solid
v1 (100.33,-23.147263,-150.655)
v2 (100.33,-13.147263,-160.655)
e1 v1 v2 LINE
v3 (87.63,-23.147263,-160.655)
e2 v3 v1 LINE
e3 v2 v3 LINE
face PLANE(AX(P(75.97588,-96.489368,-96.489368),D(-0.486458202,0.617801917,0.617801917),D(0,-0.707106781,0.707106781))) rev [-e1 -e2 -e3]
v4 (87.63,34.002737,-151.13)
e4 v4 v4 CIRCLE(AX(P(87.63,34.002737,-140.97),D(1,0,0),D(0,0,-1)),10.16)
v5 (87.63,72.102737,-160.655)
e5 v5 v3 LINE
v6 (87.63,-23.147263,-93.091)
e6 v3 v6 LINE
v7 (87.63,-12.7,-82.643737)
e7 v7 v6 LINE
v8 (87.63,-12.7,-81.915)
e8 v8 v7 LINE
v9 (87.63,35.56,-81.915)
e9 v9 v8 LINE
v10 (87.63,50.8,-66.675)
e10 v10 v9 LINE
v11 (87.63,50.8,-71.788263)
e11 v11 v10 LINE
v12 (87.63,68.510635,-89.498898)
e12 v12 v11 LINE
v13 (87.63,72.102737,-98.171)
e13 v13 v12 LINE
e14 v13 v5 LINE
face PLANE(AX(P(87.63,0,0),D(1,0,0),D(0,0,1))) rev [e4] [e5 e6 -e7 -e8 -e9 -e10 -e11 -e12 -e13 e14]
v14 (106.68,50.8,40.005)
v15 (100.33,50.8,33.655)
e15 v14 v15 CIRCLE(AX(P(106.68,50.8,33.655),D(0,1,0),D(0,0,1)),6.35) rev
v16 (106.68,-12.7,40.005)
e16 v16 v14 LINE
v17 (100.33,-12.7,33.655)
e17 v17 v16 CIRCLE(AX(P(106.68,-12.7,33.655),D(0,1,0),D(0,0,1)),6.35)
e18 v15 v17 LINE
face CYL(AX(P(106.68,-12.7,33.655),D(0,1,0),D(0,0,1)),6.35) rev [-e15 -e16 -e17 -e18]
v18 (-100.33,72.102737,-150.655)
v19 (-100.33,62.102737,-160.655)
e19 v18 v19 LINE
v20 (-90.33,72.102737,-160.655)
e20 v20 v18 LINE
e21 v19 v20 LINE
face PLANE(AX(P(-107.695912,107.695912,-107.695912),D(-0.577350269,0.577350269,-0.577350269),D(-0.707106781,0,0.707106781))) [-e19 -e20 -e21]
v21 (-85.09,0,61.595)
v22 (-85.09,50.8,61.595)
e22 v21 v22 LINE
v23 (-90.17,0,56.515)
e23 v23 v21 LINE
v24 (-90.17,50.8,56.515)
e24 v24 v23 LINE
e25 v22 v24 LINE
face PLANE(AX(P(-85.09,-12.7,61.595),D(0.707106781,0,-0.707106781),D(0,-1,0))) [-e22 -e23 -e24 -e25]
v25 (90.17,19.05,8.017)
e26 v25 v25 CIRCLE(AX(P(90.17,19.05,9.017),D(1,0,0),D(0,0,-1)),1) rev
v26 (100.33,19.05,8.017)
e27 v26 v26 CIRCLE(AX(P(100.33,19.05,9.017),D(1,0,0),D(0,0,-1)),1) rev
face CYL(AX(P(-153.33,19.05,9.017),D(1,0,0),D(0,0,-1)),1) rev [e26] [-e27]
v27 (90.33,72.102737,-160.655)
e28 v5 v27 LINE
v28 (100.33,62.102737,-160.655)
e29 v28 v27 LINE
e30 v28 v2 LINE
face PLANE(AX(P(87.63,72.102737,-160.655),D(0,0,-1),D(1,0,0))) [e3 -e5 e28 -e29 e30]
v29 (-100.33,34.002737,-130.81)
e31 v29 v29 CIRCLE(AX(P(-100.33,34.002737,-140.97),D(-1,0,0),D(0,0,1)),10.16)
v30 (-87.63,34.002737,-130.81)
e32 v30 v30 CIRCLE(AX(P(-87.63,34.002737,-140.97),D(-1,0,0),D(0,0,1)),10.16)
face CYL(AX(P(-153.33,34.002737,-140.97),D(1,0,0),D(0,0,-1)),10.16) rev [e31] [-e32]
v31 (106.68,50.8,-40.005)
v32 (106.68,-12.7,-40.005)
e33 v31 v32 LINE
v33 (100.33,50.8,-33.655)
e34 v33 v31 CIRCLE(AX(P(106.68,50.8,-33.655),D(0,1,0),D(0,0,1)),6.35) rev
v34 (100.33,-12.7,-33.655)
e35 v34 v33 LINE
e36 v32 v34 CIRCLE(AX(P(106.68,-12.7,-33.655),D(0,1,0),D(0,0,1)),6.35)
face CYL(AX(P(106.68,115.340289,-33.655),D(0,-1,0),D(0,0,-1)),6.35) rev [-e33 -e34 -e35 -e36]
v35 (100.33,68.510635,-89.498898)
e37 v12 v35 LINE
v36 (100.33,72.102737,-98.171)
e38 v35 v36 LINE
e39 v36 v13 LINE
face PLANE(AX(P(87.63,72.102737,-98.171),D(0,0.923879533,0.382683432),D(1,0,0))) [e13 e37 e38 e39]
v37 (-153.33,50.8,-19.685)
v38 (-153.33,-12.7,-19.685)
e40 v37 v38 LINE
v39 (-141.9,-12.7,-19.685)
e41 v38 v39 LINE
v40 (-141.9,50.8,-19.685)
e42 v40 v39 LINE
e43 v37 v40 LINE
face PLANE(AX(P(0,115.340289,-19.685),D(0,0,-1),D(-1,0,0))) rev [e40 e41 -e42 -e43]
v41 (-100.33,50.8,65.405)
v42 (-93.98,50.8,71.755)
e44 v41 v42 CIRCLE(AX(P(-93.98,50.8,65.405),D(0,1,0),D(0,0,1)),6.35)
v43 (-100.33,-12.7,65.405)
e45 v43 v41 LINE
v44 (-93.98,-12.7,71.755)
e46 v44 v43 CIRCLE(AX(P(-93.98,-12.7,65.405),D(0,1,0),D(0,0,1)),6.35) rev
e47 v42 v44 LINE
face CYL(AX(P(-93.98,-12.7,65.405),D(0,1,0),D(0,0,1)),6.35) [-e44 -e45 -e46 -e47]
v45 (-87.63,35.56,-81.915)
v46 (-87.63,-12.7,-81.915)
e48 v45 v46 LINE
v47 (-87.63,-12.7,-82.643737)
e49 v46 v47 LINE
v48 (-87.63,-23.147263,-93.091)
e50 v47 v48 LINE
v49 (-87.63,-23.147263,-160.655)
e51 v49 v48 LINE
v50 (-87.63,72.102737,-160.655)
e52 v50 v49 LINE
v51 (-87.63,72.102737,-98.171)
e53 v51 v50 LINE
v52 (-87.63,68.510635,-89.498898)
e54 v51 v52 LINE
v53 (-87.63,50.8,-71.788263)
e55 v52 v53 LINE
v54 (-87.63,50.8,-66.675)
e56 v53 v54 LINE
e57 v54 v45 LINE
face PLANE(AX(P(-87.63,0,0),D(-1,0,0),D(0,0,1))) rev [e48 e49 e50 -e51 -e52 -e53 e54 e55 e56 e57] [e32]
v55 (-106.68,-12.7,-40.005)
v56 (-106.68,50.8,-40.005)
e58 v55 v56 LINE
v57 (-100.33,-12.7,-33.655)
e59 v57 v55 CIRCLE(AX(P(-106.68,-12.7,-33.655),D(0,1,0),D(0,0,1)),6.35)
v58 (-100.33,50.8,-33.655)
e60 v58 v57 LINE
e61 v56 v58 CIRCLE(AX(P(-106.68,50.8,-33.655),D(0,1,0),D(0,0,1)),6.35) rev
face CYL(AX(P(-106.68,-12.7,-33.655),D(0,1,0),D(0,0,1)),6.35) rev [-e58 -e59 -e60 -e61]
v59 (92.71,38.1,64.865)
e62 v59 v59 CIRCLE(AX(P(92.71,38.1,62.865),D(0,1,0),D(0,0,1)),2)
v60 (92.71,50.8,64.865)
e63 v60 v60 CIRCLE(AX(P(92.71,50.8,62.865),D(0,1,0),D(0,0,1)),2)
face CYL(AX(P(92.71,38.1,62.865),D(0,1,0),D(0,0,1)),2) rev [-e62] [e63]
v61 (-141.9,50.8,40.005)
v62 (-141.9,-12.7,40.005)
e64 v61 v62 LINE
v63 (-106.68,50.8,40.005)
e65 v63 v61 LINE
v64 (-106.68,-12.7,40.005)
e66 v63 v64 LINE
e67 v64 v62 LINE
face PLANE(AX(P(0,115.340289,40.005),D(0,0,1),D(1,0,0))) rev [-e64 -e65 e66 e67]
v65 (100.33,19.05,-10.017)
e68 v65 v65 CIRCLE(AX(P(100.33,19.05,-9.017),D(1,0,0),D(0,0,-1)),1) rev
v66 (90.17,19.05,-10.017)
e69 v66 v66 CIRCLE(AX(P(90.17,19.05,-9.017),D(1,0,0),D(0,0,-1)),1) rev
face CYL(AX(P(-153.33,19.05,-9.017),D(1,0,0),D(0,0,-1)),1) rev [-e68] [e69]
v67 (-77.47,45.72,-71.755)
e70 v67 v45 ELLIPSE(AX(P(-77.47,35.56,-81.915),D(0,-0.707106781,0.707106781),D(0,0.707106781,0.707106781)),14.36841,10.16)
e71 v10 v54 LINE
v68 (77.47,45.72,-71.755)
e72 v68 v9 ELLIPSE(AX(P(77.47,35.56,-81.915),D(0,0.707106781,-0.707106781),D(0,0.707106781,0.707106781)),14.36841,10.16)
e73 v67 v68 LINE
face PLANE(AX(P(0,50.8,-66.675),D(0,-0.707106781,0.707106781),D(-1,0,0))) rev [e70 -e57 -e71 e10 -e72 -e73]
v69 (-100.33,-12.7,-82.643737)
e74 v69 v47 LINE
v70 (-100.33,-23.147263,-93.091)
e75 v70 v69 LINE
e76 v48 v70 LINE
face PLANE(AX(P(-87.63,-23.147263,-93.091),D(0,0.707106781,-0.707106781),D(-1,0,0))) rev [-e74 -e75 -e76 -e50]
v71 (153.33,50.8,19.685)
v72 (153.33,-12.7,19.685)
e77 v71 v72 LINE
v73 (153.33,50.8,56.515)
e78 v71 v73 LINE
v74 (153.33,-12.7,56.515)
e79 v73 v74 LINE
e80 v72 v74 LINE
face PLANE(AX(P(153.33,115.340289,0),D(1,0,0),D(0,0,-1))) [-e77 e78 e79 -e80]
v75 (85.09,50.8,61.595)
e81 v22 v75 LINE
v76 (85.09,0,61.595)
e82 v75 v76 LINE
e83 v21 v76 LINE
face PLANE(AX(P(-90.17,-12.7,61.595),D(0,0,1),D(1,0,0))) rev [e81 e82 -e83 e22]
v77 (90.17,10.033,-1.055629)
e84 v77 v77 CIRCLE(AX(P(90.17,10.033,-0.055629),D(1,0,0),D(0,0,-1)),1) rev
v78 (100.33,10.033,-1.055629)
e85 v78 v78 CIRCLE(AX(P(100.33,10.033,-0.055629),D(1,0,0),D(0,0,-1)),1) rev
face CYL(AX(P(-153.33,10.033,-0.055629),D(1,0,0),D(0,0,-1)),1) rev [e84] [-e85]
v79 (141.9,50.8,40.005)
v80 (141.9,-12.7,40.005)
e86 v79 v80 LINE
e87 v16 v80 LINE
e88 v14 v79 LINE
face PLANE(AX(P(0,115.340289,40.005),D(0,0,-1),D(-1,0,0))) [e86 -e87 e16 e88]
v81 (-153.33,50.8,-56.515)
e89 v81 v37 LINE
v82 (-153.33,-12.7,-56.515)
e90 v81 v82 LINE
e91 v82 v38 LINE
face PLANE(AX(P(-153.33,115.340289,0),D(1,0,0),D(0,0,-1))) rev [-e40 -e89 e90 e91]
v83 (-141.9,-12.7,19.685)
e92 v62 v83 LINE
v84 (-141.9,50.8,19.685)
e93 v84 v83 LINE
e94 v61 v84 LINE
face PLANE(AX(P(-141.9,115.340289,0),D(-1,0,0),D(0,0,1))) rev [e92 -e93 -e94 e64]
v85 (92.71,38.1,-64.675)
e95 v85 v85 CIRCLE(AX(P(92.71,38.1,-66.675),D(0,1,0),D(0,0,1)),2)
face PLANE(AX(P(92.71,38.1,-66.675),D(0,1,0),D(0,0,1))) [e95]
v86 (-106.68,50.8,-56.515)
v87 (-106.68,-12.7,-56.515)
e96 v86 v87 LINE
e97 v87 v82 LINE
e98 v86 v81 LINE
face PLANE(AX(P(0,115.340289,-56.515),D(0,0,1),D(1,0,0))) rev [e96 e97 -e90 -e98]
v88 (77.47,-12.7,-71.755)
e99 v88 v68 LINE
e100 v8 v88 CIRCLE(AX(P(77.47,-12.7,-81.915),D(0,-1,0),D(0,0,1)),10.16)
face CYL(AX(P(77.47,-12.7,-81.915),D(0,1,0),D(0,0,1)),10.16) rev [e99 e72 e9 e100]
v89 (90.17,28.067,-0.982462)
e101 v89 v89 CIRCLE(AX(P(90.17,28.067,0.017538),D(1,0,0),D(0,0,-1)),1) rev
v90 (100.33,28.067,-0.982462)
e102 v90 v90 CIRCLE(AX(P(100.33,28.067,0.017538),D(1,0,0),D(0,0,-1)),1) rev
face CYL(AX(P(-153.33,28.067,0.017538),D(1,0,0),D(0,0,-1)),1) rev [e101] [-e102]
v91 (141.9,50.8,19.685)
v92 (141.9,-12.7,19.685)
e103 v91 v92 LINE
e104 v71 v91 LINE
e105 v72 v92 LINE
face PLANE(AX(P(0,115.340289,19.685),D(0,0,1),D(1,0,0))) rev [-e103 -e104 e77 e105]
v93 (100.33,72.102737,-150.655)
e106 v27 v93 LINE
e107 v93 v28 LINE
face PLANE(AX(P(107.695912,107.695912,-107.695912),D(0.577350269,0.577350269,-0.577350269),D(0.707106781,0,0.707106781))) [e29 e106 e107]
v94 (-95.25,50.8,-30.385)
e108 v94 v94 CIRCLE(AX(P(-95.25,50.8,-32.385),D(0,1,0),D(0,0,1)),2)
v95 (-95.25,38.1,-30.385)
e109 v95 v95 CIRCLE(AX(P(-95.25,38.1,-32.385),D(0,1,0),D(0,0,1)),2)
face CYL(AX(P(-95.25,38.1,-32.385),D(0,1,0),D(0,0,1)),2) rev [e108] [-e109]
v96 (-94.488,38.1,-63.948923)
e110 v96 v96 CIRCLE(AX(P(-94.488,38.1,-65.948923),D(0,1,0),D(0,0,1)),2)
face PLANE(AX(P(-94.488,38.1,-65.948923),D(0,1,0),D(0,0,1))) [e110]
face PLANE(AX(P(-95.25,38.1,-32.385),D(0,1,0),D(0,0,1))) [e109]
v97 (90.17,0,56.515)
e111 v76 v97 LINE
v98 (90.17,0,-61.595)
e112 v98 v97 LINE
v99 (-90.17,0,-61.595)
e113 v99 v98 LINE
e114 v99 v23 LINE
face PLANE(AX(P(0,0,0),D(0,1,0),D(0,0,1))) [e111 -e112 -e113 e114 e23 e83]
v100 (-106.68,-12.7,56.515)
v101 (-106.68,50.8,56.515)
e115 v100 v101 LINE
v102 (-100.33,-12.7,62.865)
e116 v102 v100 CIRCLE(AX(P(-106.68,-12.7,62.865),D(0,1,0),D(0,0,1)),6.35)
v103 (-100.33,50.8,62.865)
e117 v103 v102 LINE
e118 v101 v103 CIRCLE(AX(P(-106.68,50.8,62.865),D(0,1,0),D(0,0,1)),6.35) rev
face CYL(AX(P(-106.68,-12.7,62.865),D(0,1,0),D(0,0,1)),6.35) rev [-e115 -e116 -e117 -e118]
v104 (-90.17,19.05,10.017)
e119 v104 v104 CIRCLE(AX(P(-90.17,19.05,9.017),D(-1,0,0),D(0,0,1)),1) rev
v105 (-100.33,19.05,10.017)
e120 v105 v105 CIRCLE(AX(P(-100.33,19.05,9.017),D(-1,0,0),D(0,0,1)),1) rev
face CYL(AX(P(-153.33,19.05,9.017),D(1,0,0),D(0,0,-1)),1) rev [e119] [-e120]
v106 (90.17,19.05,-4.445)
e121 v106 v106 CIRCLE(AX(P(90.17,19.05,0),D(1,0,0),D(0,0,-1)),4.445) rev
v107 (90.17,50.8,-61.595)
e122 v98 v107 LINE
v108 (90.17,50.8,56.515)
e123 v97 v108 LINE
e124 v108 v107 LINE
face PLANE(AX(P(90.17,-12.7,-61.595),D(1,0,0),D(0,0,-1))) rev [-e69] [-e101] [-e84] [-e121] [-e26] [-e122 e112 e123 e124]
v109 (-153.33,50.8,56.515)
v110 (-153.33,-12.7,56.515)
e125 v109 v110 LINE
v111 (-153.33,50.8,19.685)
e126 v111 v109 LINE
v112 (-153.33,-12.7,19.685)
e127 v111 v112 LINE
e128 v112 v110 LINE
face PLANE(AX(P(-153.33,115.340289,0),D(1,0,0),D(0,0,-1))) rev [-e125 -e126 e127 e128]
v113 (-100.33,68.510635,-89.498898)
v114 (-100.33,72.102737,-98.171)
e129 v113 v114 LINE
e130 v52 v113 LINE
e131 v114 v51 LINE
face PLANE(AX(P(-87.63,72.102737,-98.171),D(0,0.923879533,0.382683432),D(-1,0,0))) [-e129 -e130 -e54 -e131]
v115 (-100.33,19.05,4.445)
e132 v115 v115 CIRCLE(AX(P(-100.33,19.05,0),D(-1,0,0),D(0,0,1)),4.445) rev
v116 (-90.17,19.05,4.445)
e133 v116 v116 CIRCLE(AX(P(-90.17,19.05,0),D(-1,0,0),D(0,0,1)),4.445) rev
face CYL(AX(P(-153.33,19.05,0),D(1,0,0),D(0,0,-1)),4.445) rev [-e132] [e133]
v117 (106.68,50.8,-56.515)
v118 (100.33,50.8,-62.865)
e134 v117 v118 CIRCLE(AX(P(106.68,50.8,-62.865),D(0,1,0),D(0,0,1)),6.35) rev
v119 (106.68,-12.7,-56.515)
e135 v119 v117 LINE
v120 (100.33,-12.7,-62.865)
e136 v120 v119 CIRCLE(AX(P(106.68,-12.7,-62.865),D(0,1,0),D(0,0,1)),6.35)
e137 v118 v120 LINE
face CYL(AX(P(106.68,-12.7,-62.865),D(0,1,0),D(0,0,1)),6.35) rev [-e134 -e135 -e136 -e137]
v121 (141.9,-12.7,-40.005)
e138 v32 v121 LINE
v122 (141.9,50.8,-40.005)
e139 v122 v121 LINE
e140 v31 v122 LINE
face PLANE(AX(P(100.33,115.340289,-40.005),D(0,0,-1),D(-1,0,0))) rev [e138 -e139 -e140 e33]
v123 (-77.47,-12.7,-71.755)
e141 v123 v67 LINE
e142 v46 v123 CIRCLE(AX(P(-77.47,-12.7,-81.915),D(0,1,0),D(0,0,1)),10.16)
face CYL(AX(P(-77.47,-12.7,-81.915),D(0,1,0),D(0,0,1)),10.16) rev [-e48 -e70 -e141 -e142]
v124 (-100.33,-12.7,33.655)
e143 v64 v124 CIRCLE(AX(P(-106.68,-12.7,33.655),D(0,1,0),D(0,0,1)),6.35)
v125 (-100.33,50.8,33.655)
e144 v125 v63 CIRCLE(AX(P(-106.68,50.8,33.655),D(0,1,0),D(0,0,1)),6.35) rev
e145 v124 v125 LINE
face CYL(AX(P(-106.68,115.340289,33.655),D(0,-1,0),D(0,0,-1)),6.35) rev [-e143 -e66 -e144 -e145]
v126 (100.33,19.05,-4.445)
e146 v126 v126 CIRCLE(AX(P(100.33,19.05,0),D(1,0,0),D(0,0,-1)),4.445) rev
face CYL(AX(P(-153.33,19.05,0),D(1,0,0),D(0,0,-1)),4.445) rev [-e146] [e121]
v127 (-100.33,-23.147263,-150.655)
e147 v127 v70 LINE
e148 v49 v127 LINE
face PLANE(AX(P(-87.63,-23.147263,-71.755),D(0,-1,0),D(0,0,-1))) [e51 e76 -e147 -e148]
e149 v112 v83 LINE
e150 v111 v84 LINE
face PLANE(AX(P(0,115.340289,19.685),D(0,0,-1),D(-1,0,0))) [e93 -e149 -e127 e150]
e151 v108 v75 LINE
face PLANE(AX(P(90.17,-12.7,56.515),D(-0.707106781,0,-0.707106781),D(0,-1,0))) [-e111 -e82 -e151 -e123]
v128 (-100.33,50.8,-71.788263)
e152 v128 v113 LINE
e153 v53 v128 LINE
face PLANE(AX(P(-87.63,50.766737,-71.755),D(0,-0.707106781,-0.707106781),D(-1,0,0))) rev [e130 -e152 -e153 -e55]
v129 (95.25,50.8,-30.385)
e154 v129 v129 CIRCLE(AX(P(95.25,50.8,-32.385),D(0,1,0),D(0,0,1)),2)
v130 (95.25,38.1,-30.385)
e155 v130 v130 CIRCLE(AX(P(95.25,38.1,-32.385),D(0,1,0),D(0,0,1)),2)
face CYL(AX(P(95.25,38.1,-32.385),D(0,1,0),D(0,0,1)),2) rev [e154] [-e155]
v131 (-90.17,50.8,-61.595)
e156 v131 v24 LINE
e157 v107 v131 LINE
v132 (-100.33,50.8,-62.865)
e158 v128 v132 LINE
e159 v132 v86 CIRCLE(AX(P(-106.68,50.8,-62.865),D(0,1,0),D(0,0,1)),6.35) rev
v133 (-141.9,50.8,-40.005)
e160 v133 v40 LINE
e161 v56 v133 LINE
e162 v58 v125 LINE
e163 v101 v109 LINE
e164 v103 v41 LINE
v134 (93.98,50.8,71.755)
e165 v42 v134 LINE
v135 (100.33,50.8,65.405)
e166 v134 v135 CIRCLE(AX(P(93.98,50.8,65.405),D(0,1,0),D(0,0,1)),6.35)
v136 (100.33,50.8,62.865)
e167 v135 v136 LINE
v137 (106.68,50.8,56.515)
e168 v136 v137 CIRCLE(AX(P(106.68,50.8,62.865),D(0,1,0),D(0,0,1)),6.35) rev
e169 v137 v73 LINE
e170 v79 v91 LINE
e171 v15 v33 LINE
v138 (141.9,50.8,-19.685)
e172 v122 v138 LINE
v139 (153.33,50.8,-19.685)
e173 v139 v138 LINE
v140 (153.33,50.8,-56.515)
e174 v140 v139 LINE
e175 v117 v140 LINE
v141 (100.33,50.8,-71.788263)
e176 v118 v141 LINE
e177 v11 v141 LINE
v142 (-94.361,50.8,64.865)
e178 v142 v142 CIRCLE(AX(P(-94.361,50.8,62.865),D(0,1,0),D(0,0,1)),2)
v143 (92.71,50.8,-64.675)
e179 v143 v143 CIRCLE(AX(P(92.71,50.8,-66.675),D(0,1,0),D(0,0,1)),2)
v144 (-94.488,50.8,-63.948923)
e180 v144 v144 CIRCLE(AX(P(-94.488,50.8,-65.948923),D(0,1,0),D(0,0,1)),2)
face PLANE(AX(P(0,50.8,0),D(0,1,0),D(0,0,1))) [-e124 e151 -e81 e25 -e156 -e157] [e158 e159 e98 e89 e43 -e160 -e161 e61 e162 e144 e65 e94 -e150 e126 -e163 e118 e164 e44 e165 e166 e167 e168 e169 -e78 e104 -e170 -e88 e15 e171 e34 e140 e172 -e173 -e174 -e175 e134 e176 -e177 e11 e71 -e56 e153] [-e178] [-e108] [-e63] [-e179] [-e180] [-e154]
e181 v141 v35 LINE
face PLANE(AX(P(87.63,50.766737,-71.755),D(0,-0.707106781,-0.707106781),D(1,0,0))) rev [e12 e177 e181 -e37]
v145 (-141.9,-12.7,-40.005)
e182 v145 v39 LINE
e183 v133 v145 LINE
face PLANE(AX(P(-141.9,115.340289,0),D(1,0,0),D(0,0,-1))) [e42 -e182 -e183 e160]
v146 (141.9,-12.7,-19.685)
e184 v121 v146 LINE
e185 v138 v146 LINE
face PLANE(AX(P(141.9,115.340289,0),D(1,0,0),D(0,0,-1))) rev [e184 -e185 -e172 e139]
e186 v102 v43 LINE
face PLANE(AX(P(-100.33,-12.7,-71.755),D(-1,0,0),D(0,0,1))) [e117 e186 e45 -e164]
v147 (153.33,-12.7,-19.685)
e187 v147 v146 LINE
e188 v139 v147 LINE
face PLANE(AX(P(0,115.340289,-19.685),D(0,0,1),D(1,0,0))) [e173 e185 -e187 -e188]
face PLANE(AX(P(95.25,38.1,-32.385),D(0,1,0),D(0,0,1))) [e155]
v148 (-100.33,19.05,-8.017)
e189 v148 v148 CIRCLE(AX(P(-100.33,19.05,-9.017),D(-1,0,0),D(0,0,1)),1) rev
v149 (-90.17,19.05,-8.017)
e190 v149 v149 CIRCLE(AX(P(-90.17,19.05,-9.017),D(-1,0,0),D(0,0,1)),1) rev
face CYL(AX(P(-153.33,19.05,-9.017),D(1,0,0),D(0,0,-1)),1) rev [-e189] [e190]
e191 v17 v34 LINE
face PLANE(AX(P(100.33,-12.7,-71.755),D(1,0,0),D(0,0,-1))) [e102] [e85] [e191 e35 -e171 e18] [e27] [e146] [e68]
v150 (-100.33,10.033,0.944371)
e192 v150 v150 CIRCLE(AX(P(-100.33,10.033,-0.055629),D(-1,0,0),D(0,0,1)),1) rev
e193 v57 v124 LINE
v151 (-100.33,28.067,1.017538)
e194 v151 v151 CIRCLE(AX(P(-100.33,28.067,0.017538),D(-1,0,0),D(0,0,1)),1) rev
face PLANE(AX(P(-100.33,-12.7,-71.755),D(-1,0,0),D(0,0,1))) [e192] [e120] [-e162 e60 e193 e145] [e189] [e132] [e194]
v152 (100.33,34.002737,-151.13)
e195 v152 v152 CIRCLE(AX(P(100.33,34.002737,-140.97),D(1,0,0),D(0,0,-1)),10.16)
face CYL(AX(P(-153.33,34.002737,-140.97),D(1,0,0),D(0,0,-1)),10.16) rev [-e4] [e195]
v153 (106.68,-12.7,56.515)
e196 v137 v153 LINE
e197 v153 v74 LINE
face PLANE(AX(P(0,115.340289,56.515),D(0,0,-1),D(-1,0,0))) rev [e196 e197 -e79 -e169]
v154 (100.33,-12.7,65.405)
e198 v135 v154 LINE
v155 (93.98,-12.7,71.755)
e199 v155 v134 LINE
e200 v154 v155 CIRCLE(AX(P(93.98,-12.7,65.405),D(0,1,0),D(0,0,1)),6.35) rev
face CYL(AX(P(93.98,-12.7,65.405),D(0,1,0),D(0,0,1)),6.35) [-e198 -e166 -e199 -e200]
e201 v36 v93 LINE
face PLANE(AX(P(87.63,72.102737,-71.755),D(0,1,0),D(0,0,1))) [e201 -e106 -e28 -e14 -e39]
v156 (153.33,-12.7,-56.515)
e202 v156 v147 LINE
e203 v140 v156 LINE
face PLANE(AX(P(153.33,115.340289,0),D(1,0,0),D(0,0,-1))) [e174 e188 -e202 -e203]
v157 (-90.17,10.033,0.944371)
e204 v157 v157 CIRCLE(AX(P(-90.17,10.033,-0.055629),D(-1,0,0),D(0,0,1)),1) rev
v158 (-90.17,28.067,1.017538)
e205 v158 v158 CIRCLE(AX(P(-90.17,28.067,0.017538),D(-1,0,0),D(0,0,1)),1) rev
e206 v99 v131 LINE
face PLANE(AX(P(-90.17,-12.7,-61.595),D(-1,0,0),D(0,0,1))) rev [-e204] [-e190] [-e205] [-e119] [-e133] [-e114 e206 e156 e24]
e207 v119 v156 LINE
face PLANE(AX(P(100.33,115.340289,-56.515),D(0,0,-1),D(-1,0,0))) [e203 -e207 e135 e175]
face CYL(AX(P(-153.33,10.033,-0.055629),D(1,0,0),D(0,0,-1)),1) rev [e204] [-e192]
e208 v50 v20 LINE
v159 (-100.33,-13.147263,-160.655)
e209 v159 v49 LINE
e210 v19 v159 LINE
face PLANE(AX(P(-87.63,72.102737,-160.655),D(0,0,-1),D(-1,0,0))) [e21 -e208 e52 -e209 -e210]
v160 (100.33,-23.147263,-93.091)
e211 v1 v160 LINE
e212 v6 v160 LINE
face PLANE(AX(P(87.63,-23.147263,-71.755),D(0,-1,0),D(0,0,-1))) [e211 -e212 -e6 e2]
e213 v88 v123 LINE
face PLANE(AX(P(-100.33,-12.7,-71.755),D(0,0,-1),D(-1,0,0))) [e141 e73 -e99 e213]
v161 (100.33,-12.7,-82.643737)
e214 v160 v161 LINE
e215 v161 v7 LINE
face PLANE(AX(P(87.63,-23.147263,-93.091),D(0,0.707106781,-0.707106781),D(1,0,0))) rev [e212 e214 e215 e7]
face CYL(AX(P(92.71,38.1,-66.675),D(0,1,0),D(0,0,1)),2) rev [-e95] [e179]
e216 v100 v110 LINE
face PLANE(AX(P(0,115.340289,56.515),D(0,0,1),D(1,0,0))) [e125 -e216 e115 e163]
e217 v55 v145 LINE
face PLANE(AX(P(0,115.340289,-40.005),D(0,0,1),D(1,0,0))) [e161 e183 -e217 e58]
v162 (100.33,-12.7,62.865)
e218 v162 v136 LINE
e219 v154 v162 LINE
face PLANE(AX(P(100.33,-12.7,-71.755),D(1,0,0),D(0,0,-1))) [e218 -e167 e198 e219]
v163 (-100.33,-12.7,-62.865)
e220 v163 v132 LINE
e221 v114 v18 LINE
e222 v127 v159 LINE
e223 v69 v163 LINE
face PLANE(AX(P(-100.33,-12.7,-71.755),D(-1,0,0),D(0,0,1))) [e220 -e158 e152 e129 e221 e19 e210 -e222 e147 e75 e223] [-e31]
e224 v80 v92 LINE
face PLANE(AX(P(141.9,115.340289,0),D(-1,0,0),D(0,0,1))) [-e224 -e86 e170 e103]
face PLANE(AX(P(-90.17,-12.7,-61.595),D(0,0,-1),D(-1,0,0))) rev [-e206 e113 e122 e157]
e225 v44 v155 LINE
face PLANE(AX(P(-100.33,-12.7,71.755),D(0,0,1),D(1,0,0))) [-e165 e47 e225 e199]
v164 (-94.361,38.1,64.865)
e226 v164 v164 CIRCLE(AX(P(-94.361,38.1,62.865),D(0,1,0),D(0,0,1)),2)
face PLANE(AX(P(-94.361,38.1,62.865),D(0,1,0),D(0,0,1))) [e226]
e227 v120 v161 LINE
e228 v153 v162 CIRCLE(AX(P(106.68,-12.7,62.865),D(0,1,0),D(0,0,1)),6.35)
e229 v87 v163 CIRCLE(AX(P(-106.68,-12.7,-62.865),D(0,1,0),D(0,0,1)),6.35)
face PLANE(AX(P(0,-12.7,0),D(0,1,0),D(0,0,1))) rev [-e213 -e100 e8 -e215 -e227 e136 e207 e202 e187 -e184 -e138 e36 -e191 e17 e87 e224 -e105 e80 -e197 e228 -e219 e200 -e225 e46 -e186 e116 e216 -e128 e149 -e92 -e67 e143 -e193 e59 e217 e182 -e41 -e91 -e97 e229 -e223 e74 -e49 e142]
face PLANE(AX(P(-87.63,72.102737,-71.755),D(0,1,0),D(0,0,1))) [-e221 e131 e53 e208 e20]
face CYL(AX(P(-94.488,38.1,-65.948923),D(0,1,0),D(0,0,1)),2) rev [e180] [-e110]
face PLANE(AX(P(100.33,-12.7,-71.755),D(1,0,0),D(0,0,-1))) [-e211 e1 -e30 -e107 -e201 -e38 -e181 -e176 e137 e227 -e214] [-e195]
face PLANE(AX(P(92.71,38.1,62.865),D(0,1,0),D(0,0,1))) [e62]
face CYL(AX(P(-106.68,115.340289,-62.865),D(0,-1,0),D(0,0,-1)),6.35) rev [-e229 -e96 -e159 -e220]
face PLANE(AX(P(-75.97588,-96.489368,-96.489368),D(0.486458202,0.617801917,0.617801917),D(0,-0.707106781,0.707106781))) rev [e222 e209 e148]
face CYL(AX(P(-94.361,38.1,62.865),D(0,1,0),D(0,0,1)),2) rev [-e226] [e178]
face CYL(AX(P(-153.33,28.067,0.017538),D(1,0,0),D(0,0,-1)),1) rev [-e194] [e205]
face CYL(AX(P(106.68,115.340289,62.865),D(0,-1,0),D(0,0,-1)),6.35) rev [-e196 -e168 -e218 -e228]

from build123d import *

# Parameters (mm, degrees)
BOSS_EXTRUDE1_DEPTH      = 50.8
BOSS_EXTRUDE1_DEPTH_BACK = 12.7
SKETCH3_W                = 200.66
SKETCH3_H                = 143.51
SKETCH3_W_2              = 180.34
SKETCH3_H_2              = 123.19
SKETCH3_3_W              = 180.34
SKETCH3_3_H              = 123.19
BOSS_EXTRUDE2_DEPTH      = 12.7
BOSS_EXTRUDE3_DEPTH      = 63.5
CUT_EXTRUDE1_DEPTH       = 269.463806918
CUT_EXTRUDE1_DEPTH_BACK  = 269.463806918
SKETCH5_R                = 4.445
SKETCH5_R_2              = 1.000000032
SKETCH5_R_3              = 1
FILLET1_R                = 6.35
SKETCH7_W                = 88.9
SKETCH7_H                = 95.25
BOSS_EXTRUDE4_DEPTH      = 12.7
CHAMFER1_SIZE            = 21.336
CHAMFER2_START           = -163
CHAMFER2_OUTLINE_W       = 17
CHAMFER2_OUTLINE_H       = 17
CHAMFER2_DEPTH           = 6.818277269
CHAMFER3_START           = -193
CHAMFER3_OUTLINE_W       = 15
CHAMFER3_OUTLINE_H       = 17
CHAMFER3_DEPTH           = 6.465208093
CHAMFER4_SIZE            = 5.08
CHAMFER5_SIZE            = 5.08
FILLET3_R                = 10.16
CHAMFER6_SIZE            = 5.08
CUT_EXTRUDE2_DEPTH       = 299.446905332
CUT_EXTRUDE2_DEPTH_BACK  = 299.446905332
SKETCH8_R                = 10.16
SKETCH9_R                = 2
SKETCH9_R_2              = 2.000000064
CUT_EXTRUDE3_DEPTH       = 12.7


with BuildPart() as part:
    # Sketch3 → Boss-Extrude1 (new, two sides: drawn at the far end of the back side and taken through both)
    with BuildSketch(Plane(origin=(0, 0, 0), x_dir=(1, 0, 0), z_dir=(0, 1, 0)).offset(-BOSS_EXTRUDE1_DEPTH_BACK)):
        Rectangle(SKETCH3_W, SKETCH3_H)
        Rectangle(SKETCH3_W_2, SKETCH3_H_2, mode=Mode.SUBTRACT)
    extrude(amount=BOSS_EXTRUDE1_DEPTH + BOSS_EXTRUDE1_DEPTH_BACK)

    # Sketch3<3> → Boss-Extrude2 (add)
    with BuildSketch(Plane(origin=(0, 0, 0), x_dir=(1, 0, 0), z_dir=(0, 1, 0))):
        Rectangle(SKETCH3_3_W, SKETCH3_3_H)
    extrude(amount=-BOSS_EXTRUDE2_DEPTH)

    # Sketch4 → Boss-Extrude3 (add)
    with BuildSketch(Plane(origin=(0, -12.7, 0), x_dir=(-1, 0, 0), z_dir=(0, -1, 0))):
        Polygon((153.329999918, 56.515), (100.33, 56.515), (100.33, 40.005), (141.899999918, 40.005), (141.899999918, 19.685), (153.329999918, 19.685), align=None)
        Polygon((141.9, -40.005), (100.33, -40.005), (100.33, -56.515), (153.33, -56.515), (153.33, -19.685), (141.9, -19.685), align=None)
        Polygon((-100.33, 40.005), (-100.33, 56.515), (-153.329999918, 56.515), (-153.329999918, 19.685), (-141.899999918, 19.685), (-141.899999918, 40.005), align=None)
        Polygon((-100.33, -40.005), (-141.9, -40.005), (-141.9, -19.685), (-153.33, -19.685), (-153.33, -56.515), (-100.33, -56.515), align=None)
    extrude(amount=-BOSS_EXTRUDE3_DEPTH)

    # Sketch5 → Cut-Extrude1 (cut, two sides: drawn at the far end of the back side and taken through both)
    with BuildSketch(Plane.ZY.offset(100.33).offset(-CUT_EXTRUDE1_DEPTH_BACK)):
        with Locations(Location((0, 19.05, 0), (0, 0, 180))):
            Circle(SKETCH5_R)
        with Locations(Location((-9.017, 19.05, 0), (0, 0, 180))):
            Circle(SKETCH5_R_2)
        with Locations(Location((9.017, 19.05, 0), (0, 0, 180))):
            Circle(SKETCH5_R_3)
        with Locations(Location((0.017538483, 28.067, 0), (0, 0, 180))):
            Circle(SKETCH5_R_3)
        with Locations(Location((-0.055629344, 10.033, 0), (0, 0, 180))):
            Circle(SKETCH5_R_3)
    extrude(amount=CUT_EXTRUDE1_DEPTH + CUT_EXTRUDE1_DEPTH_BACK, mode=Mode.SUBTRACT)

    # Fillet1
    fillet1_edges = [part.edges().sort_by_distance(p)[0] for p in [
        (100.33, 19.05, -56.515),
        (100.33, 19.05, -40.005),
        (-100.33, 19.05, -40.005),
        (-100.33, 19.05, -56.515),
        (-100.33, 19.05, 40.005),
        (-100.33, 19.05, 56.515),
        (100.33, 19.05, 71.755),
        (-100.33, 19.05, 71.755),
        (100.33, 19.05, 56.515),
        (100.33, 19.05, 40.005),
    ]]
    fillet(fillet1_edges, radius=FILLET1_R)

    # Sketch7 → Boss-Extrude4 (add)
    with BuildSketch(Plane.ZY.offset(100.33)):
        with Locations((-116.205, 24.477736962)):
            Rectangle(SKETCH7_W, SKETCH7_H)
    extrude(amount=-BOSS_EXTRUDE4_DEPTH)

    # Chamfer1
    # the kernel refuses this chamfer: 21.336 mm, written as the material it takes off along each edge
    with BuildSketch(Plane(origin=(-155.199428231, 72.102736962, -71.755), x_dir=(0, -1, 0), z_dir=(1, 0, 0))) as chamfer1_piece_1_section:
        Polygon((CHAMFER1_SIZE, 0), (0, CHAMFER1_SIZE), (0, 0), align=None)
    chamfer1_piece_1 = extrude(amount=122.438856462, mode=Mode.PRIVATE)
    chamfer1_piece_1 = split(chamfer1_piece_1, bisect_by=Plane(origin=(-155.199428231, 50.8, -71.755), z_dir=(0, 1, 0)), keep=Keep.TOP, mode=Mode.PRIVATE)
    add(chamfer1_piece_1, mode=Mode.SUBTRACT)
    with BuildSketch(Plane(origin=(-155.199428231, -23.147263038, -71.755), x_dir=(0, 1, 0), z_dir=(1, 0, 0))) as chamfer1_piece_2_section:
        Polygon((CHAMFER1_SIZE, 0), (0, -CHAMFER1_SIZE), (0, 0), align=None)
    chamfer1_piece_2 = extrude(amount=122.438856462, mode=Mode.PRIVATE)
    chamfer1_piece_2 = split(chamfer1_piece_2, bisect_by=Plane(origin=(-155.199428231, -12.7, -71.755), z_dir=(0, -1, 0)), keep=Keep.TOP, mode=Mode.PRIVATE)
    add(chamfer1_piece_2, mode=Mode.SUBTRACT)

    # Chamfer2: read off the stored shape, not the designer's step
    # Chamfer2 outline → Chamfer2 (cut)
    with BuildSketch(Plane(origin=(0, 0, 0), x_dir=(0.8737038499063027, -0.34397789366389886, -0.34397789366389886), z_dir=(0.4864582023760161, 0.6178019170175401, 0.6178019170175401)).offset(CHAMFER2_START)):
        with Locations((-20.5, 97.5)):
            Rectangle(CHAMFER2_OUTLINE_W, CHAMFER2_OUTLINE_H)
    extrude(amount=CHAMFER2_DEPTH, mode=Mode.SUBTRACT)

    # Chamfer3: read off the stored shape, not the designer's step
    # Chamfer3 outline → Chamfer3 (cut)
    with BuildSketch(Plane(origin=(0, 0, 0), x_dir=(0.8164965809277258, 0.40824829046386313, -0.40824829046386313), z_dir=(0.5773502691896258, -0.5773502691896258, 0.5773502691896258)).offset(CHAMFER3_START)):
        with Locations((15.5, -62.5)):
            Rectangle(CHAMFER3_OUTLINE_W, CHAMFER3_OUTLINE_H)
    extrude(amount=CHAMFER3_DEPTH, mode=Mode.SUBTRACT)

    # Chamfer4
    chamfer4_edges = [part.edges().sort_by_distance(p)[0] for p in [
        (-90.17, 25.4, 61.595),
        (90.17, 25.4, 61.595),
    ]]
    chamfer(chamfer4_edges, length=CHAMFER4_SIZE)

    # Chamfer5
    chamfer5_edges = [part.edges().sort_by_distance(p)[0] for p in [
        (6.35, 50.8, -71.755),
    ]]
    chamfer(chamfer5_edges, length=CHAMFER5_SIZE)

    # Fillet3
    fillet3_edges = [part.edges().sort_by_distance(p)[0] for p in [
        (-87.63, 16.51, -71.755),
    ]]
    fillet(fillet3_edges, radius=FILLET3_R)

    # Chamfer6
    chamfer6_edges = [part.edges().sort_by_distance(p)[0] for p in [
        (-93.98, 72.102736962, -93.091),
    ]]
    chamfer(chamfer6_edges, length=CHAMFER6_SIZE)

    # Mirror1: part across plane


with BuildPart() as part_1:
    add(part.part)
    add(part.part.mirror(Plane.ZY))

    # Sketch8 → Cut-Extrude2 (cut, two sides: drawn at the far end of the back side and taken through both)
    with BuildSketch(Plane(origin=(-87.63, 0, 0), x_dir=(0, 0, -1), z_dir=(1, 0, 0)).offset(-CUT_EXTRUDE2_DEPTH_BACK)):
        with Locations((140.97, 34.002736962)):
            Circle(SKETCH8_R)
    extrude(amount=CUT_EXTRUDE2_DEPTH + CUT_EXTRUDE2_DEPTH_BACK, mode=Mode.SUBTRACT)

    # Sketch9 → Cut-Extrude3 (cut)
    with BuildSketch(Plane(origin=(0, 50.8, 0), x_dir=(1, 0, 0), z_dir=(0, 1, 0))):
        with Locations(Location((-94.488, 65.948922821, 0), (0, 0, 270))):
            Circle(SKETCH9_R)
        with Locations(Location((-95.25, 32.385, 0), (0, 0, 270))):
            Circle(SKETCH9_R)
        with Locations(Location((-94.361, -62.865, 0), (0, 0, 270))):
            Circle(SKETCH9_R_2)
        with Locations(Location((92.71, -62.865, 0), (0, 0, 270))):
            Circle(SKETCH9_R)
        with Locations(Location((92.71, 66.675, 0), (0, 0, 270))):
            Circle(SKETCH9_R)
        with Locations(Location((95.25, 32.385, 0), (0, 0, 270))):
            Circle(SKETCH9_R)
    extrude(amount=-CUT_EXTRUDE3_DEPTH, mode=Mode.SUBTRACT)


solid = part_1.part
